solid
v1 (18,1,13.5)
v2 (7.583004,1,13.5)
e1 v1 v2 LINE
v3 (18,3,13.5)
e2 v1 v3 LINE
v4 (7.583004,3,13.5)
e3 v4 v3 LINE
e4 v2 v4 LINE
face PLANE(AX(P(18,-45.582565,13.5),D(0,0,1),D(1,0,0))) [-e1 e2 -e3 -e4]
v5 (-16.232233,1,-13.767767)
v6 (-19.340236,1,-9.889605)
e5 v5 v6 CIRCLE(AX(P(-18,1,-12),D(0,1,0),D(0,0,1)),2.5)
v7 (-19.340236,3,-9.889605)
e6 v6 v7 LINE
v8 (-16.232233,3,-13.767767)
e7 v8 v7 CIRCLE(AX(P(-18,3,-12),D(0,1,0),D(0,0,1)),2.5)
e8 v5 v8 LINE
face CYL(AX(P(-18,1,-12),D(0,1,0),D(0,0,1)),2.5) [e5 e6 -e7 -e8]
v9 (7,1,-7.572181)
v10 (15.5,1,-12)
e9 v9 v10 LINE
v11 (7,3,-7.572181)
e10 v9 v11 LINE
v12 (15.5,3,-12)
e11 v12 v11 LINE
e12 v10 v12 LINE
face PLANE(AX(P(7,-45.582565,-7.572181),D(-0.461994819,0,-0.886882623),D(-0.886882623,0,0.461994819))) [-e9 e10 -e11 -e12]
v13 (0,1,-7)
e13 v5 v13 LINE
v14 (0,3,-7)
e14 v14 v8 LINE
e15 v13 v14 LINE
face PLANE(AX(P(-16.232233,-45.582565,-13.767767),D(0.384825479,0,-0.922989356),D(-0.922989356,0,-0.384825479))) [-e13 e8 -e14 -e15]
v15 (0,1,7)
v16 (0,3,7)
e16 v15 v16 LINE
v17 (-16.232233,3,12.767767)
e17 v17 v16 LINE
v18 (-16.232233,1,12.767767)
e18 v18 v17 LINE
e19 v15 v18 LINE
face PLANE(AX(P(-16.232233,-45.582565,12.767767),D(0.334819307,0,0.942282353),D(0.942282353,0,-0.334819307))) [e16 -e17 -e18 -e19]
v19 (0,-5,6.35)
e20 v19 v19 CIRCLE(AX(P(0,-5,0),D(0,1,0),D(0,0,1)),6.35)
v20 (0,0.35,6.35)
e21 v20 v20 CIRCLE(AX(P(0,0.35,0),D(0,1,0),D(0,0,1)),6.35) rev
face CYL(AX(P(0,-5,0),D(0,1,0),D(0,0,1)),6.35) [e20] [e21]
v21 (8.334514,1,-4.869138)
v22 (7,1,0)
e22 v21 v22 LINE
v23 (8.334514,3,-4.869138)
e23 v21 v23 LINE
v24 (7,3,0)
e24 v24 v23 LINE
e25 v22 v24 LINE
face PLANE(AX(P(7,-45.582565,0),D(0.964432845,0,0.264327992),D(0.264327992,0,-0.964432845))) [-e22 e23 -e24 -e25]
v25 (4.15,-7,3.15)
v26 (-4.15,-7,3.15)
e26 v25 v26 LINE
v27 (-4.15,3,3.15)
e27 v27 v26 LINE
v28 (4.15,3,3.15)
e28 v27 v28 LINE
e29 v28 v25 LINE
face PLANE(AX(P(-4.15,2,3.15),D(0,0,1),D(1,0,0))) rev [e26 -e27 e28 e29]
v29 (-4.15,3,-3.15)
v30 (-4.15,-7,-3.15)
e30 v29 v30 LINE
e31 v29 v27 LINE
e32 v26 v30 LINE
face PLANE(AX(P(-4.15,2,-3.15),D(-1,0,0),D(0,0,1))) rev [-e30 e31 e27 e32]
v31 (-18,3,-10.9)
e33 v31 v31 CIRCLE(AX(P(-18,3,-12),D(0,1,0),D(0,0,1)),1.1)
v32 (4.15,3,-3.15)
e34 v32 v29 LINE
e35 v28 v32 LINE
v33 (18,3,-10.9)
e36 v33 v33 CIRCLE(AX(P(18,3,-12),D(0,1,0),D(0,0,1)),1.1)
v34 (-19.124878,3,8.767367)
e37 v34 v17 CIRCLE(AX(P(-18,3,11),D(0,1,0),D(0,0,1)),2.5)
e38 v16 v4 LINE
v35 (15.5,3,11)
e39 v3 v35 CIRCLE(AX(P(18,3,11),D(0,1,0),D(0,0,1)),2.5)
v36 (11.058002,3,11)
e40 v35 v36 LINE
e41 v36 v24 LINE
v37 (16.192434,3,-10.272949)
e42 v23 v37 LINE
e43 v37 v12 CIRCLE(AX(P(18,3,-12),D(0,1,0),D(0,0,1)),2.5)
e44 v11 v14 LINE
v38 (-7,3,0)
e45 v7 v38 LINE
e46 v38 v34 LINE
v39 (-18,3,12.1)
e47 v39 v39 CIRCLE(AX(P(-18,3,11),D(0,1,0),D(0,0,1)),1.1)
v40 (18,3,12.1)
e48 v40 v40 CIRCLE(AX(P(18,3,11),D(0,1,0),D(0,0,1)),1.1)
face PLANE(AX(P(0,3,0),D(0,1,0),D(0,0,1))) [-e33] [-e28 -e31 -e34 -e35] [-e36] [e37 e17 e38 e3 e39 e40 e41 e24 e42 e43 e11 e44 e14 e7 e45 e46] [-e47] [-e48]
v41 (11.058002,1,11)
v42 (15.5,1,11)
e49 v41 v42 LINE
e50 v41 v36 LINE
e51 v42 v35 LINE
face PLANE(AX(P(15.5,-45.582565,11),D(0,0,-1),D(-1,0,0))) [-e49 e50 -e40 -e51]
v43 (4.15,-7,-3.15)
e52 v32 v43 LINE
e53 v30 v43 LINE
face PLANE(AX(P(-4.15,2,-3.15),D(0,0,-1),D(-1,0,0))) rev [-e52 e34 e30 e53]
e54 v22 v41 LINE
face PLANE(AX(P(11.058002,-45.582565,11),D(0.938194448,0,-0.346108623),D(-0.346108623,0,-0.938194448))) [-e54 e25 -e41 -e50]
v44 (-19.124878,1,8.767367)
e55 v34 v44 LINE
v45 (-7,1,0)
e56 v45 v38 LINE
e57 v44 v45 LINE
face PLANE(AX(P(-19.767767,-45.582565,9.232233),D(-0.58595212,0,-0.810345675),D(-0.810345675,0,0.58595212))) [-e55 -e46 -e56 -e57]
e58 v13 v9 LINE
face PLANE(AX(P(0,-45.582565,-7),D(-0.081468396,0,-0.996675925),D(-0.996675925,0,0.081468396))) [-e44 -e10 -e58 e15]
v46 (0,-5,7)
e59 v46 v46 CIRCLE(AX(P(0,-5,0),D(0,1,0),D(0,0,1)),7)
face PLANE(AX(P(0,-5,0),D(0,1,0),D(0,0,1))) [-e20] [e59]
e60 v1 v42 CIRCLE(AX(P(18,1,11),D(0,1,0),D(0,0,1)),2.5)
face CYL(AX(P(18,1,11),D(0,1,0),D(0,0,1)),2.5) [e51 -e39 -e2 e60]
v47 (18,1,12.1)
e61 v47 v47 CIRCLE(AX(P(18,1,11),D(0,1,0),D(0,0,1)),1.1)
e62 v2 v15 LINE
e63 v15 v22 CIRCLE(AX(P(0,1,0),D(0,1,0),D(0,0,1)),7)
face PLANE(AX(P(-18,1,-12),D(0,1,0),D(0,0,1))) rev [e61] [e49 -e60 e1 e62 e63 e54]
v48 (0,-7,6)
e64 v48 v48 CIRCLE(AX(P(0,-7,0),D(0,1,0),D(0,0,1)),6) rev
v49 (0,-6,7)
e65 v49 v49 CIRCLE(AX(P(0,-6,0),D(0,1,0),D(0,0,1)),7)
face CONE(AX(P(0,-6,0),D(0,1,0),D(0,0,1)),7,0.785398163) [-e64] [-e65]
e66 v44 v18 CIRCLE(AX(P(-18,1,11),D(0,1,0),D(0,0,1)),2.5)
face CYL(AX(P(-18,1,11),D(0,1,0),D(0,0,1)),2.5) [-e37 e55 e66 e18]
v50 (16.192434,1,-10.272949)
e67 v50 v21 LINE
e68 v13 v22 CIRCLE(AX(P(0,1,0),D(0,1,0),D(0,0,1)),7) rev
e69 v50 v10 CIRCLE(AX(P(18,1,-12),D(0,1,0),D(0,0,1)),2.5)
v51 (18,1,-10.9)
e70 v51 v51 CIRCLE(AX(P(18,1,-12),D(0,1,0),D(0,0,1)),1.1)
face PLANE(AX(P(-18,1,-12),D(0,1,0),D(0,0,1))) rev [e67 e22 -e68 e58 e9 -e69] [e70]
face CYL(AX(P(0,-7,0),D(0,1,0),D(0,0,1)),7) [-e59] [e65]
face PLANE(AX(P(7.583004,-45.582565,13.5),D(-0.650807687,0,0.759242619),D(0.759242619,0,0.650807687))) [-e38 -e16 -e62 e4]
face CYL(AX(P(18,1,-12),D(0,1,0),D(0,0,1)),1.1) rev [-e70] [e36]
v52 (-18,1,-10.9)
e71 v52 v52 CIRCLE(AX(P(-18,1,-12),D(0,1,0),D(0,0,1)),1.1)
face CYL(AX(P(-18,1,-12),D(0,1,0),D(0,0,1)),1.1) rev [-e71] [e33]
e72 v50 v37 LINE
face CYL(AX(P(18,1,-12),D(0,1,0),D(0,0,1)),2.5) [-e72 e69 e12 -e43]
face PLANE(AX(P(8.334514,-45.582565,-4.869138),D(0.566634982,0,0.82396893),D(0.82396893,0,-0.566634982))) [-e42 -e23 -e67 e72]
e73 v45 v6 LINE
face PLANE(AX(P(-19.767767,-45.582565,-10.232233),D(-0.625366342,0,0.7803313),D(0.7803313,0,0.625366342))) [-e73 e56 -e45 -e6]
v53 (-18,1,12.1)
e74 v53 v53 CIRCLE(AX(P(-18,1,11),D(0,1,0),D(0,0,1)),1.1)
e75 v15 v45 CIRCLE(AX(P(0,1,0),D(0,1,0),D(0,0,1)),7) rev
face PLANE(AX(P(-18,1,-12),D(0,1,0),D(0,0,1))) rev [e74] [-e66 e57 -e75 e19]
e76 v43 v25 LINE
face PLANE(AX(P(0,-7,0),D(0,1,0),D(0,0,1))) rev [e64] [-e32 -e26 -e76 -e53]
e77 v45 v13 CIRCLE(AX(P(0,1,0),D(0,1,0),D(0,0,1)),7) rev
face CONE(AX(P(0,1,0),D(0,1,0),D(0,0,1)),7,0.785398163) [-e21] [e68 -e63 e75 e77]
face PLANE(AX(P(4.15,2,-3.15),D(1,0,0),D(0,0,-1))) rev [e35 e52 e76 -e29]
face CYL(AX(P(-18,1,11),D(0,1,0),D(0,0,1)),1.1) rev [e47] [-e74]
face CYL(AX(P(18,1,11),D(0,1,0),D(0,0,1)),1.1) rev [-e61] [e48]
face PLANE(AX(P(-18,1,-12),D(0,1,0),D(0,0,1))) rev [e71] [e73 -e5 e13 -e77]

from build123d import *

# Parameters (mm, degrees)
SKETCH1_R                  = 6.35
BOSS_EXTRUDE1_DEPTH        = 5
SKETCH2_R                  = 7
BOSS_EXTRUDE2_DEPTH        = 2
BOSS_EXTRUDE3_START        = -7
SKETCH2_2_R                = 7
BOSS_EXTRUDE3_DEPTH        = 2
CHAMFER1_SIZE              = 1
SKETCH3_W                  = 8.3
SKETCH3_H                  = 6.3
CUT_EXTRUDE1_DEPTH         = 14.37908816
BOSS_EXTRUDE4_DEPTH        = 1
BOSS_EXTRUDE4_DEPTH_BACK   = 1
SKETCH6_R                  = 2.5
SKETCH6_R_2                = 1.1
BOSS_EXTRUDE4_2_DEPTH      = 1
BOSS_EXTRUDE4_2_DEPTH_BACK = 1
BOSS_EXTRUDE4_3_DEPTH      = 1
BOSS_EXTRUDE4_3_DEPTH_BACK = 1
BOSS_EXTRUDE4_4_DEPTH      = 1
BOSS_EXTRUDE4_4_DEPTH_BACK = 1
SKETCH7_W                  = 8.3
SKETCH7_H                  = 6.3
BOSS_EXTRUDE5_DEPTH        = 2


with BuildPart() as part:
    # Sketch1 → Boss-Extrude1 (new body)
    with BuildSketch(Plane(origin=(0, 0, 0), x_dir=(1, 0, 0), z_dir=(0, 1, 0))):
        with Locations(Location((0, 0, 0), (0, 0, 270))):
            Circle(SKETCH1_R)
    extrude(amount=-BOSS_EXTRUDE1_DEPTH)

    # Sketch2 → Boss-Extrude2 (add)
    with BuildSketch(Plane(origin=(0, 0, 0), x_dir=(1, 0, 0), z_dir=(0, 1, 0))):
        with Locations(Location((0, 0, 0), (0, 0, 270))):
            Circle(SKETCH2_R)
    extrude(amount=BOSS_EXTRUDE2_DEPTH)

    # Sketch2<2> → Boss-Extrude3 (add)
    with BuildSketch(Plane(origin=(0, 0, 0), x_dir=(1, 0, 0), z_dir=(0, 1, 0)).offset(BOSS_EXTRUDE3_START)):
        with Locations(Location((0, 0, 0), (0, 0, 270))):
            Circle(SKETCH2_2_R)
    extrude(amount=BOSS_EXTRUDE3_DEPTH)

    # Chamfer1
    # the kernel refuses this chamfer: 1 mm, written as the material it takes off along each edge
    with BuildSketch(Plane(origin=(0, 0, 0), x_dir=(0, 0, 1), z_dir=(-1, 0, 0))) as chamfer1_piece_1_section:
        Polygon((7 - CHAMFER1_SIZE, 0), (7, CHAMFER1_SIZE), (7, 0), align=None)
    chamfer1_piece_1 = revolve(axis=Axis((0, 0, 0), (0, 1, 0)), mode=Mode.PRIVATE)
    chamfer1_piece_1 = chamfer1_piece_1 - Plane(origin=(0, 0.669896582, 0), x_dir=(0, 0, 1), z_dir=(0, 1, 0)) * Cylinder(6.35, 28, mode=Mode.PRIVATE)
    add(chamfer1_piece_1, mode=Mode.SUBTRACT)
    with BuildSketch(Plane(origin=(0, -7, 0), x_dir=(0, 0, 1), z_dir=(-1, 0, 0))) as chamfer1_piece_2:
        Polygon((7, CHAMFER1_SIZE), (7 - CHAMFER1_SIZE, 0), (7, 0), align=None)
    revolve(axis=Axis((0, -7, 0), (0, 1, 0)), mode=Mode.SUBTRACT)

    # Sketch3 → Cut-Extrude1 (cut, through all)
    with BuildSketch(Plane.XZ.offset(7)):
        Rectangle(SKETCH3_W, SKETCH3_H)
    extrude(amount=-CUT_EXTRUDE1_DEPTH, mode=Mode.SUBTRACT)



with BuildPart() as body_2:
    # Sketch6 → Boss-Extrude4 (new, two sides: drawn at the far end of the back side and taken through both)
    with BuildSketch(Plane(origin=(0, 2, 0), x_dir=(1, 0, 0), z_dir=(0, 1, 0)).offset(-BOSS_EXTRUDE4_DEPTH_BACK)):
        with Locations(Location((-18, -11, 0), (0, 0, 270))):
            Circle(SKETCH6_R)
        with Locations(Location((-18, -11, 0), (0, 0, 270))):
            Circle(SKETCH6_R_2, mode=Mode.SUBTRACT)
    extrude(amount=BOSS_EXTRUDE4_DEPTH + BOSS_EXTRUDE4_DEPTH_BACK)


with BuildPart() as body_3:
    # Sketch6 → Boss-Extrude4 2 (new, two sides: drawn at the far end of the back side and taken through both)
    with BuildSketch(Plane(origin=(0, 2, 0), x_dir=(1, 0, 0), z_dir=(0, 1, 0)).offset(-BOSS_EXTRUDE4_2_DEPTH_BACK)):
        with Locations(Location((18, -11, 0), (0, 0, 270))):
            Circle(SKETCH6_R)
        with Locations(Location((18, -11, 0), (0, 0, 270))):
            Circle(SKETCH6_R_2, mode=Mode.SUBTRACT)
    extrude(amount=BOSS_EXTRUDE4_2_DEPTH + BOSS_EXTRUDE4_2_DEPTH_BACK)


with BuildPart() as body_4:
    # Sketch6 → Boss-Extrude4 3 (new, two sides: drawn at the far end of the back side and taken through both)
    with BuildSketch(Plane(origin=(0, 2, 0), x_dir=(1, 0, 0), z_dir=(0, 1, 0)).offset(-BOSS_EXTRUDE4_3_DEPTH_BACK)):
        with Locations(Location((18, 12, 0), (0, 0, 270))):
            Circle(SKETCH6_R)
        with Locations(Location((18, 12, 0), (0, 0, 270))):
            Circle(SKETCH6_R_2, mode=Mode.SUBTRACT)
    extrude(amount=BOSS_EXTRUDE4_3_DEPTH + BOSS_EXTRUDE4_3_DEPTH_BACK)


with BuildPart() as body_5:
    # Sketch6 → Boss-Extrude4 4 (new, two sides: drawn at the far end of the back side and taken through both)
    with BuildSketch(Plane(origin=(0, 2, 0), x_dir=(1, 0, 0), z_dir=(0, 1, 0)).offset(-BOSS_EXTRUDE4_4_DEPTH_BACK)):
        with Locations(Location((-18, 12, 0), (0, 0, 270))):
            Circle(SKETCH6_R)
        with Locations(Location((-18, 12, 0), (0, 0, 270))):
            Circle(SKETCH6_R_2, mode=Mode.SUBTRACT)
    extrude(amount=BOSS_EXTRUDE4_4_DEPTH + BOSS_EXTRUDE4_4_DEPTH_BACK)


with BuildPart() as part_1:
    add(part.part)

    add(body_2.part)  # Boss-Extrude5 merges body 2

    add(body_3.part)  # Boss-Extrude5 merges body 3

    add(body_4.part)  # Boss-Extrude5 merges body 4

    add(body_5.part)  # Boss-Extrude5 merges body 5
    # Sketch7 → Boss-Extrude5 (add)
    with BuildSketch(Plane(origin=(0, 3, 0), x_dir=(1, 0, 0), z_dir=(0, 1, 0))):
        Polygon((-19.767766953, 10.232233047), (-16.232233047, 10.232233047), (-16.232233047, 13.767766953), (0, 7), (7, 7.572180743), (15.5, 12), (16.192434296, 10.272948691), (8.334514261, 4.869137674), (7, 0), (11.058001897, -11), (15.5, -11), (18, -13.5), (7.583003583, -13.5), (0, -7), (-16.232233047, -12.767766953), (-16.232233047, -9.232233047), (-19.767766953, -9.232233047), (-7, 0), align=None)
        Rectangle(SKETCH7_W, SKETCH7_H, mode=Mode.SUBTRACT)
    extrude(amount=-BOSS_EXTRUDE5_DEPTH)


solid = part_1.part
